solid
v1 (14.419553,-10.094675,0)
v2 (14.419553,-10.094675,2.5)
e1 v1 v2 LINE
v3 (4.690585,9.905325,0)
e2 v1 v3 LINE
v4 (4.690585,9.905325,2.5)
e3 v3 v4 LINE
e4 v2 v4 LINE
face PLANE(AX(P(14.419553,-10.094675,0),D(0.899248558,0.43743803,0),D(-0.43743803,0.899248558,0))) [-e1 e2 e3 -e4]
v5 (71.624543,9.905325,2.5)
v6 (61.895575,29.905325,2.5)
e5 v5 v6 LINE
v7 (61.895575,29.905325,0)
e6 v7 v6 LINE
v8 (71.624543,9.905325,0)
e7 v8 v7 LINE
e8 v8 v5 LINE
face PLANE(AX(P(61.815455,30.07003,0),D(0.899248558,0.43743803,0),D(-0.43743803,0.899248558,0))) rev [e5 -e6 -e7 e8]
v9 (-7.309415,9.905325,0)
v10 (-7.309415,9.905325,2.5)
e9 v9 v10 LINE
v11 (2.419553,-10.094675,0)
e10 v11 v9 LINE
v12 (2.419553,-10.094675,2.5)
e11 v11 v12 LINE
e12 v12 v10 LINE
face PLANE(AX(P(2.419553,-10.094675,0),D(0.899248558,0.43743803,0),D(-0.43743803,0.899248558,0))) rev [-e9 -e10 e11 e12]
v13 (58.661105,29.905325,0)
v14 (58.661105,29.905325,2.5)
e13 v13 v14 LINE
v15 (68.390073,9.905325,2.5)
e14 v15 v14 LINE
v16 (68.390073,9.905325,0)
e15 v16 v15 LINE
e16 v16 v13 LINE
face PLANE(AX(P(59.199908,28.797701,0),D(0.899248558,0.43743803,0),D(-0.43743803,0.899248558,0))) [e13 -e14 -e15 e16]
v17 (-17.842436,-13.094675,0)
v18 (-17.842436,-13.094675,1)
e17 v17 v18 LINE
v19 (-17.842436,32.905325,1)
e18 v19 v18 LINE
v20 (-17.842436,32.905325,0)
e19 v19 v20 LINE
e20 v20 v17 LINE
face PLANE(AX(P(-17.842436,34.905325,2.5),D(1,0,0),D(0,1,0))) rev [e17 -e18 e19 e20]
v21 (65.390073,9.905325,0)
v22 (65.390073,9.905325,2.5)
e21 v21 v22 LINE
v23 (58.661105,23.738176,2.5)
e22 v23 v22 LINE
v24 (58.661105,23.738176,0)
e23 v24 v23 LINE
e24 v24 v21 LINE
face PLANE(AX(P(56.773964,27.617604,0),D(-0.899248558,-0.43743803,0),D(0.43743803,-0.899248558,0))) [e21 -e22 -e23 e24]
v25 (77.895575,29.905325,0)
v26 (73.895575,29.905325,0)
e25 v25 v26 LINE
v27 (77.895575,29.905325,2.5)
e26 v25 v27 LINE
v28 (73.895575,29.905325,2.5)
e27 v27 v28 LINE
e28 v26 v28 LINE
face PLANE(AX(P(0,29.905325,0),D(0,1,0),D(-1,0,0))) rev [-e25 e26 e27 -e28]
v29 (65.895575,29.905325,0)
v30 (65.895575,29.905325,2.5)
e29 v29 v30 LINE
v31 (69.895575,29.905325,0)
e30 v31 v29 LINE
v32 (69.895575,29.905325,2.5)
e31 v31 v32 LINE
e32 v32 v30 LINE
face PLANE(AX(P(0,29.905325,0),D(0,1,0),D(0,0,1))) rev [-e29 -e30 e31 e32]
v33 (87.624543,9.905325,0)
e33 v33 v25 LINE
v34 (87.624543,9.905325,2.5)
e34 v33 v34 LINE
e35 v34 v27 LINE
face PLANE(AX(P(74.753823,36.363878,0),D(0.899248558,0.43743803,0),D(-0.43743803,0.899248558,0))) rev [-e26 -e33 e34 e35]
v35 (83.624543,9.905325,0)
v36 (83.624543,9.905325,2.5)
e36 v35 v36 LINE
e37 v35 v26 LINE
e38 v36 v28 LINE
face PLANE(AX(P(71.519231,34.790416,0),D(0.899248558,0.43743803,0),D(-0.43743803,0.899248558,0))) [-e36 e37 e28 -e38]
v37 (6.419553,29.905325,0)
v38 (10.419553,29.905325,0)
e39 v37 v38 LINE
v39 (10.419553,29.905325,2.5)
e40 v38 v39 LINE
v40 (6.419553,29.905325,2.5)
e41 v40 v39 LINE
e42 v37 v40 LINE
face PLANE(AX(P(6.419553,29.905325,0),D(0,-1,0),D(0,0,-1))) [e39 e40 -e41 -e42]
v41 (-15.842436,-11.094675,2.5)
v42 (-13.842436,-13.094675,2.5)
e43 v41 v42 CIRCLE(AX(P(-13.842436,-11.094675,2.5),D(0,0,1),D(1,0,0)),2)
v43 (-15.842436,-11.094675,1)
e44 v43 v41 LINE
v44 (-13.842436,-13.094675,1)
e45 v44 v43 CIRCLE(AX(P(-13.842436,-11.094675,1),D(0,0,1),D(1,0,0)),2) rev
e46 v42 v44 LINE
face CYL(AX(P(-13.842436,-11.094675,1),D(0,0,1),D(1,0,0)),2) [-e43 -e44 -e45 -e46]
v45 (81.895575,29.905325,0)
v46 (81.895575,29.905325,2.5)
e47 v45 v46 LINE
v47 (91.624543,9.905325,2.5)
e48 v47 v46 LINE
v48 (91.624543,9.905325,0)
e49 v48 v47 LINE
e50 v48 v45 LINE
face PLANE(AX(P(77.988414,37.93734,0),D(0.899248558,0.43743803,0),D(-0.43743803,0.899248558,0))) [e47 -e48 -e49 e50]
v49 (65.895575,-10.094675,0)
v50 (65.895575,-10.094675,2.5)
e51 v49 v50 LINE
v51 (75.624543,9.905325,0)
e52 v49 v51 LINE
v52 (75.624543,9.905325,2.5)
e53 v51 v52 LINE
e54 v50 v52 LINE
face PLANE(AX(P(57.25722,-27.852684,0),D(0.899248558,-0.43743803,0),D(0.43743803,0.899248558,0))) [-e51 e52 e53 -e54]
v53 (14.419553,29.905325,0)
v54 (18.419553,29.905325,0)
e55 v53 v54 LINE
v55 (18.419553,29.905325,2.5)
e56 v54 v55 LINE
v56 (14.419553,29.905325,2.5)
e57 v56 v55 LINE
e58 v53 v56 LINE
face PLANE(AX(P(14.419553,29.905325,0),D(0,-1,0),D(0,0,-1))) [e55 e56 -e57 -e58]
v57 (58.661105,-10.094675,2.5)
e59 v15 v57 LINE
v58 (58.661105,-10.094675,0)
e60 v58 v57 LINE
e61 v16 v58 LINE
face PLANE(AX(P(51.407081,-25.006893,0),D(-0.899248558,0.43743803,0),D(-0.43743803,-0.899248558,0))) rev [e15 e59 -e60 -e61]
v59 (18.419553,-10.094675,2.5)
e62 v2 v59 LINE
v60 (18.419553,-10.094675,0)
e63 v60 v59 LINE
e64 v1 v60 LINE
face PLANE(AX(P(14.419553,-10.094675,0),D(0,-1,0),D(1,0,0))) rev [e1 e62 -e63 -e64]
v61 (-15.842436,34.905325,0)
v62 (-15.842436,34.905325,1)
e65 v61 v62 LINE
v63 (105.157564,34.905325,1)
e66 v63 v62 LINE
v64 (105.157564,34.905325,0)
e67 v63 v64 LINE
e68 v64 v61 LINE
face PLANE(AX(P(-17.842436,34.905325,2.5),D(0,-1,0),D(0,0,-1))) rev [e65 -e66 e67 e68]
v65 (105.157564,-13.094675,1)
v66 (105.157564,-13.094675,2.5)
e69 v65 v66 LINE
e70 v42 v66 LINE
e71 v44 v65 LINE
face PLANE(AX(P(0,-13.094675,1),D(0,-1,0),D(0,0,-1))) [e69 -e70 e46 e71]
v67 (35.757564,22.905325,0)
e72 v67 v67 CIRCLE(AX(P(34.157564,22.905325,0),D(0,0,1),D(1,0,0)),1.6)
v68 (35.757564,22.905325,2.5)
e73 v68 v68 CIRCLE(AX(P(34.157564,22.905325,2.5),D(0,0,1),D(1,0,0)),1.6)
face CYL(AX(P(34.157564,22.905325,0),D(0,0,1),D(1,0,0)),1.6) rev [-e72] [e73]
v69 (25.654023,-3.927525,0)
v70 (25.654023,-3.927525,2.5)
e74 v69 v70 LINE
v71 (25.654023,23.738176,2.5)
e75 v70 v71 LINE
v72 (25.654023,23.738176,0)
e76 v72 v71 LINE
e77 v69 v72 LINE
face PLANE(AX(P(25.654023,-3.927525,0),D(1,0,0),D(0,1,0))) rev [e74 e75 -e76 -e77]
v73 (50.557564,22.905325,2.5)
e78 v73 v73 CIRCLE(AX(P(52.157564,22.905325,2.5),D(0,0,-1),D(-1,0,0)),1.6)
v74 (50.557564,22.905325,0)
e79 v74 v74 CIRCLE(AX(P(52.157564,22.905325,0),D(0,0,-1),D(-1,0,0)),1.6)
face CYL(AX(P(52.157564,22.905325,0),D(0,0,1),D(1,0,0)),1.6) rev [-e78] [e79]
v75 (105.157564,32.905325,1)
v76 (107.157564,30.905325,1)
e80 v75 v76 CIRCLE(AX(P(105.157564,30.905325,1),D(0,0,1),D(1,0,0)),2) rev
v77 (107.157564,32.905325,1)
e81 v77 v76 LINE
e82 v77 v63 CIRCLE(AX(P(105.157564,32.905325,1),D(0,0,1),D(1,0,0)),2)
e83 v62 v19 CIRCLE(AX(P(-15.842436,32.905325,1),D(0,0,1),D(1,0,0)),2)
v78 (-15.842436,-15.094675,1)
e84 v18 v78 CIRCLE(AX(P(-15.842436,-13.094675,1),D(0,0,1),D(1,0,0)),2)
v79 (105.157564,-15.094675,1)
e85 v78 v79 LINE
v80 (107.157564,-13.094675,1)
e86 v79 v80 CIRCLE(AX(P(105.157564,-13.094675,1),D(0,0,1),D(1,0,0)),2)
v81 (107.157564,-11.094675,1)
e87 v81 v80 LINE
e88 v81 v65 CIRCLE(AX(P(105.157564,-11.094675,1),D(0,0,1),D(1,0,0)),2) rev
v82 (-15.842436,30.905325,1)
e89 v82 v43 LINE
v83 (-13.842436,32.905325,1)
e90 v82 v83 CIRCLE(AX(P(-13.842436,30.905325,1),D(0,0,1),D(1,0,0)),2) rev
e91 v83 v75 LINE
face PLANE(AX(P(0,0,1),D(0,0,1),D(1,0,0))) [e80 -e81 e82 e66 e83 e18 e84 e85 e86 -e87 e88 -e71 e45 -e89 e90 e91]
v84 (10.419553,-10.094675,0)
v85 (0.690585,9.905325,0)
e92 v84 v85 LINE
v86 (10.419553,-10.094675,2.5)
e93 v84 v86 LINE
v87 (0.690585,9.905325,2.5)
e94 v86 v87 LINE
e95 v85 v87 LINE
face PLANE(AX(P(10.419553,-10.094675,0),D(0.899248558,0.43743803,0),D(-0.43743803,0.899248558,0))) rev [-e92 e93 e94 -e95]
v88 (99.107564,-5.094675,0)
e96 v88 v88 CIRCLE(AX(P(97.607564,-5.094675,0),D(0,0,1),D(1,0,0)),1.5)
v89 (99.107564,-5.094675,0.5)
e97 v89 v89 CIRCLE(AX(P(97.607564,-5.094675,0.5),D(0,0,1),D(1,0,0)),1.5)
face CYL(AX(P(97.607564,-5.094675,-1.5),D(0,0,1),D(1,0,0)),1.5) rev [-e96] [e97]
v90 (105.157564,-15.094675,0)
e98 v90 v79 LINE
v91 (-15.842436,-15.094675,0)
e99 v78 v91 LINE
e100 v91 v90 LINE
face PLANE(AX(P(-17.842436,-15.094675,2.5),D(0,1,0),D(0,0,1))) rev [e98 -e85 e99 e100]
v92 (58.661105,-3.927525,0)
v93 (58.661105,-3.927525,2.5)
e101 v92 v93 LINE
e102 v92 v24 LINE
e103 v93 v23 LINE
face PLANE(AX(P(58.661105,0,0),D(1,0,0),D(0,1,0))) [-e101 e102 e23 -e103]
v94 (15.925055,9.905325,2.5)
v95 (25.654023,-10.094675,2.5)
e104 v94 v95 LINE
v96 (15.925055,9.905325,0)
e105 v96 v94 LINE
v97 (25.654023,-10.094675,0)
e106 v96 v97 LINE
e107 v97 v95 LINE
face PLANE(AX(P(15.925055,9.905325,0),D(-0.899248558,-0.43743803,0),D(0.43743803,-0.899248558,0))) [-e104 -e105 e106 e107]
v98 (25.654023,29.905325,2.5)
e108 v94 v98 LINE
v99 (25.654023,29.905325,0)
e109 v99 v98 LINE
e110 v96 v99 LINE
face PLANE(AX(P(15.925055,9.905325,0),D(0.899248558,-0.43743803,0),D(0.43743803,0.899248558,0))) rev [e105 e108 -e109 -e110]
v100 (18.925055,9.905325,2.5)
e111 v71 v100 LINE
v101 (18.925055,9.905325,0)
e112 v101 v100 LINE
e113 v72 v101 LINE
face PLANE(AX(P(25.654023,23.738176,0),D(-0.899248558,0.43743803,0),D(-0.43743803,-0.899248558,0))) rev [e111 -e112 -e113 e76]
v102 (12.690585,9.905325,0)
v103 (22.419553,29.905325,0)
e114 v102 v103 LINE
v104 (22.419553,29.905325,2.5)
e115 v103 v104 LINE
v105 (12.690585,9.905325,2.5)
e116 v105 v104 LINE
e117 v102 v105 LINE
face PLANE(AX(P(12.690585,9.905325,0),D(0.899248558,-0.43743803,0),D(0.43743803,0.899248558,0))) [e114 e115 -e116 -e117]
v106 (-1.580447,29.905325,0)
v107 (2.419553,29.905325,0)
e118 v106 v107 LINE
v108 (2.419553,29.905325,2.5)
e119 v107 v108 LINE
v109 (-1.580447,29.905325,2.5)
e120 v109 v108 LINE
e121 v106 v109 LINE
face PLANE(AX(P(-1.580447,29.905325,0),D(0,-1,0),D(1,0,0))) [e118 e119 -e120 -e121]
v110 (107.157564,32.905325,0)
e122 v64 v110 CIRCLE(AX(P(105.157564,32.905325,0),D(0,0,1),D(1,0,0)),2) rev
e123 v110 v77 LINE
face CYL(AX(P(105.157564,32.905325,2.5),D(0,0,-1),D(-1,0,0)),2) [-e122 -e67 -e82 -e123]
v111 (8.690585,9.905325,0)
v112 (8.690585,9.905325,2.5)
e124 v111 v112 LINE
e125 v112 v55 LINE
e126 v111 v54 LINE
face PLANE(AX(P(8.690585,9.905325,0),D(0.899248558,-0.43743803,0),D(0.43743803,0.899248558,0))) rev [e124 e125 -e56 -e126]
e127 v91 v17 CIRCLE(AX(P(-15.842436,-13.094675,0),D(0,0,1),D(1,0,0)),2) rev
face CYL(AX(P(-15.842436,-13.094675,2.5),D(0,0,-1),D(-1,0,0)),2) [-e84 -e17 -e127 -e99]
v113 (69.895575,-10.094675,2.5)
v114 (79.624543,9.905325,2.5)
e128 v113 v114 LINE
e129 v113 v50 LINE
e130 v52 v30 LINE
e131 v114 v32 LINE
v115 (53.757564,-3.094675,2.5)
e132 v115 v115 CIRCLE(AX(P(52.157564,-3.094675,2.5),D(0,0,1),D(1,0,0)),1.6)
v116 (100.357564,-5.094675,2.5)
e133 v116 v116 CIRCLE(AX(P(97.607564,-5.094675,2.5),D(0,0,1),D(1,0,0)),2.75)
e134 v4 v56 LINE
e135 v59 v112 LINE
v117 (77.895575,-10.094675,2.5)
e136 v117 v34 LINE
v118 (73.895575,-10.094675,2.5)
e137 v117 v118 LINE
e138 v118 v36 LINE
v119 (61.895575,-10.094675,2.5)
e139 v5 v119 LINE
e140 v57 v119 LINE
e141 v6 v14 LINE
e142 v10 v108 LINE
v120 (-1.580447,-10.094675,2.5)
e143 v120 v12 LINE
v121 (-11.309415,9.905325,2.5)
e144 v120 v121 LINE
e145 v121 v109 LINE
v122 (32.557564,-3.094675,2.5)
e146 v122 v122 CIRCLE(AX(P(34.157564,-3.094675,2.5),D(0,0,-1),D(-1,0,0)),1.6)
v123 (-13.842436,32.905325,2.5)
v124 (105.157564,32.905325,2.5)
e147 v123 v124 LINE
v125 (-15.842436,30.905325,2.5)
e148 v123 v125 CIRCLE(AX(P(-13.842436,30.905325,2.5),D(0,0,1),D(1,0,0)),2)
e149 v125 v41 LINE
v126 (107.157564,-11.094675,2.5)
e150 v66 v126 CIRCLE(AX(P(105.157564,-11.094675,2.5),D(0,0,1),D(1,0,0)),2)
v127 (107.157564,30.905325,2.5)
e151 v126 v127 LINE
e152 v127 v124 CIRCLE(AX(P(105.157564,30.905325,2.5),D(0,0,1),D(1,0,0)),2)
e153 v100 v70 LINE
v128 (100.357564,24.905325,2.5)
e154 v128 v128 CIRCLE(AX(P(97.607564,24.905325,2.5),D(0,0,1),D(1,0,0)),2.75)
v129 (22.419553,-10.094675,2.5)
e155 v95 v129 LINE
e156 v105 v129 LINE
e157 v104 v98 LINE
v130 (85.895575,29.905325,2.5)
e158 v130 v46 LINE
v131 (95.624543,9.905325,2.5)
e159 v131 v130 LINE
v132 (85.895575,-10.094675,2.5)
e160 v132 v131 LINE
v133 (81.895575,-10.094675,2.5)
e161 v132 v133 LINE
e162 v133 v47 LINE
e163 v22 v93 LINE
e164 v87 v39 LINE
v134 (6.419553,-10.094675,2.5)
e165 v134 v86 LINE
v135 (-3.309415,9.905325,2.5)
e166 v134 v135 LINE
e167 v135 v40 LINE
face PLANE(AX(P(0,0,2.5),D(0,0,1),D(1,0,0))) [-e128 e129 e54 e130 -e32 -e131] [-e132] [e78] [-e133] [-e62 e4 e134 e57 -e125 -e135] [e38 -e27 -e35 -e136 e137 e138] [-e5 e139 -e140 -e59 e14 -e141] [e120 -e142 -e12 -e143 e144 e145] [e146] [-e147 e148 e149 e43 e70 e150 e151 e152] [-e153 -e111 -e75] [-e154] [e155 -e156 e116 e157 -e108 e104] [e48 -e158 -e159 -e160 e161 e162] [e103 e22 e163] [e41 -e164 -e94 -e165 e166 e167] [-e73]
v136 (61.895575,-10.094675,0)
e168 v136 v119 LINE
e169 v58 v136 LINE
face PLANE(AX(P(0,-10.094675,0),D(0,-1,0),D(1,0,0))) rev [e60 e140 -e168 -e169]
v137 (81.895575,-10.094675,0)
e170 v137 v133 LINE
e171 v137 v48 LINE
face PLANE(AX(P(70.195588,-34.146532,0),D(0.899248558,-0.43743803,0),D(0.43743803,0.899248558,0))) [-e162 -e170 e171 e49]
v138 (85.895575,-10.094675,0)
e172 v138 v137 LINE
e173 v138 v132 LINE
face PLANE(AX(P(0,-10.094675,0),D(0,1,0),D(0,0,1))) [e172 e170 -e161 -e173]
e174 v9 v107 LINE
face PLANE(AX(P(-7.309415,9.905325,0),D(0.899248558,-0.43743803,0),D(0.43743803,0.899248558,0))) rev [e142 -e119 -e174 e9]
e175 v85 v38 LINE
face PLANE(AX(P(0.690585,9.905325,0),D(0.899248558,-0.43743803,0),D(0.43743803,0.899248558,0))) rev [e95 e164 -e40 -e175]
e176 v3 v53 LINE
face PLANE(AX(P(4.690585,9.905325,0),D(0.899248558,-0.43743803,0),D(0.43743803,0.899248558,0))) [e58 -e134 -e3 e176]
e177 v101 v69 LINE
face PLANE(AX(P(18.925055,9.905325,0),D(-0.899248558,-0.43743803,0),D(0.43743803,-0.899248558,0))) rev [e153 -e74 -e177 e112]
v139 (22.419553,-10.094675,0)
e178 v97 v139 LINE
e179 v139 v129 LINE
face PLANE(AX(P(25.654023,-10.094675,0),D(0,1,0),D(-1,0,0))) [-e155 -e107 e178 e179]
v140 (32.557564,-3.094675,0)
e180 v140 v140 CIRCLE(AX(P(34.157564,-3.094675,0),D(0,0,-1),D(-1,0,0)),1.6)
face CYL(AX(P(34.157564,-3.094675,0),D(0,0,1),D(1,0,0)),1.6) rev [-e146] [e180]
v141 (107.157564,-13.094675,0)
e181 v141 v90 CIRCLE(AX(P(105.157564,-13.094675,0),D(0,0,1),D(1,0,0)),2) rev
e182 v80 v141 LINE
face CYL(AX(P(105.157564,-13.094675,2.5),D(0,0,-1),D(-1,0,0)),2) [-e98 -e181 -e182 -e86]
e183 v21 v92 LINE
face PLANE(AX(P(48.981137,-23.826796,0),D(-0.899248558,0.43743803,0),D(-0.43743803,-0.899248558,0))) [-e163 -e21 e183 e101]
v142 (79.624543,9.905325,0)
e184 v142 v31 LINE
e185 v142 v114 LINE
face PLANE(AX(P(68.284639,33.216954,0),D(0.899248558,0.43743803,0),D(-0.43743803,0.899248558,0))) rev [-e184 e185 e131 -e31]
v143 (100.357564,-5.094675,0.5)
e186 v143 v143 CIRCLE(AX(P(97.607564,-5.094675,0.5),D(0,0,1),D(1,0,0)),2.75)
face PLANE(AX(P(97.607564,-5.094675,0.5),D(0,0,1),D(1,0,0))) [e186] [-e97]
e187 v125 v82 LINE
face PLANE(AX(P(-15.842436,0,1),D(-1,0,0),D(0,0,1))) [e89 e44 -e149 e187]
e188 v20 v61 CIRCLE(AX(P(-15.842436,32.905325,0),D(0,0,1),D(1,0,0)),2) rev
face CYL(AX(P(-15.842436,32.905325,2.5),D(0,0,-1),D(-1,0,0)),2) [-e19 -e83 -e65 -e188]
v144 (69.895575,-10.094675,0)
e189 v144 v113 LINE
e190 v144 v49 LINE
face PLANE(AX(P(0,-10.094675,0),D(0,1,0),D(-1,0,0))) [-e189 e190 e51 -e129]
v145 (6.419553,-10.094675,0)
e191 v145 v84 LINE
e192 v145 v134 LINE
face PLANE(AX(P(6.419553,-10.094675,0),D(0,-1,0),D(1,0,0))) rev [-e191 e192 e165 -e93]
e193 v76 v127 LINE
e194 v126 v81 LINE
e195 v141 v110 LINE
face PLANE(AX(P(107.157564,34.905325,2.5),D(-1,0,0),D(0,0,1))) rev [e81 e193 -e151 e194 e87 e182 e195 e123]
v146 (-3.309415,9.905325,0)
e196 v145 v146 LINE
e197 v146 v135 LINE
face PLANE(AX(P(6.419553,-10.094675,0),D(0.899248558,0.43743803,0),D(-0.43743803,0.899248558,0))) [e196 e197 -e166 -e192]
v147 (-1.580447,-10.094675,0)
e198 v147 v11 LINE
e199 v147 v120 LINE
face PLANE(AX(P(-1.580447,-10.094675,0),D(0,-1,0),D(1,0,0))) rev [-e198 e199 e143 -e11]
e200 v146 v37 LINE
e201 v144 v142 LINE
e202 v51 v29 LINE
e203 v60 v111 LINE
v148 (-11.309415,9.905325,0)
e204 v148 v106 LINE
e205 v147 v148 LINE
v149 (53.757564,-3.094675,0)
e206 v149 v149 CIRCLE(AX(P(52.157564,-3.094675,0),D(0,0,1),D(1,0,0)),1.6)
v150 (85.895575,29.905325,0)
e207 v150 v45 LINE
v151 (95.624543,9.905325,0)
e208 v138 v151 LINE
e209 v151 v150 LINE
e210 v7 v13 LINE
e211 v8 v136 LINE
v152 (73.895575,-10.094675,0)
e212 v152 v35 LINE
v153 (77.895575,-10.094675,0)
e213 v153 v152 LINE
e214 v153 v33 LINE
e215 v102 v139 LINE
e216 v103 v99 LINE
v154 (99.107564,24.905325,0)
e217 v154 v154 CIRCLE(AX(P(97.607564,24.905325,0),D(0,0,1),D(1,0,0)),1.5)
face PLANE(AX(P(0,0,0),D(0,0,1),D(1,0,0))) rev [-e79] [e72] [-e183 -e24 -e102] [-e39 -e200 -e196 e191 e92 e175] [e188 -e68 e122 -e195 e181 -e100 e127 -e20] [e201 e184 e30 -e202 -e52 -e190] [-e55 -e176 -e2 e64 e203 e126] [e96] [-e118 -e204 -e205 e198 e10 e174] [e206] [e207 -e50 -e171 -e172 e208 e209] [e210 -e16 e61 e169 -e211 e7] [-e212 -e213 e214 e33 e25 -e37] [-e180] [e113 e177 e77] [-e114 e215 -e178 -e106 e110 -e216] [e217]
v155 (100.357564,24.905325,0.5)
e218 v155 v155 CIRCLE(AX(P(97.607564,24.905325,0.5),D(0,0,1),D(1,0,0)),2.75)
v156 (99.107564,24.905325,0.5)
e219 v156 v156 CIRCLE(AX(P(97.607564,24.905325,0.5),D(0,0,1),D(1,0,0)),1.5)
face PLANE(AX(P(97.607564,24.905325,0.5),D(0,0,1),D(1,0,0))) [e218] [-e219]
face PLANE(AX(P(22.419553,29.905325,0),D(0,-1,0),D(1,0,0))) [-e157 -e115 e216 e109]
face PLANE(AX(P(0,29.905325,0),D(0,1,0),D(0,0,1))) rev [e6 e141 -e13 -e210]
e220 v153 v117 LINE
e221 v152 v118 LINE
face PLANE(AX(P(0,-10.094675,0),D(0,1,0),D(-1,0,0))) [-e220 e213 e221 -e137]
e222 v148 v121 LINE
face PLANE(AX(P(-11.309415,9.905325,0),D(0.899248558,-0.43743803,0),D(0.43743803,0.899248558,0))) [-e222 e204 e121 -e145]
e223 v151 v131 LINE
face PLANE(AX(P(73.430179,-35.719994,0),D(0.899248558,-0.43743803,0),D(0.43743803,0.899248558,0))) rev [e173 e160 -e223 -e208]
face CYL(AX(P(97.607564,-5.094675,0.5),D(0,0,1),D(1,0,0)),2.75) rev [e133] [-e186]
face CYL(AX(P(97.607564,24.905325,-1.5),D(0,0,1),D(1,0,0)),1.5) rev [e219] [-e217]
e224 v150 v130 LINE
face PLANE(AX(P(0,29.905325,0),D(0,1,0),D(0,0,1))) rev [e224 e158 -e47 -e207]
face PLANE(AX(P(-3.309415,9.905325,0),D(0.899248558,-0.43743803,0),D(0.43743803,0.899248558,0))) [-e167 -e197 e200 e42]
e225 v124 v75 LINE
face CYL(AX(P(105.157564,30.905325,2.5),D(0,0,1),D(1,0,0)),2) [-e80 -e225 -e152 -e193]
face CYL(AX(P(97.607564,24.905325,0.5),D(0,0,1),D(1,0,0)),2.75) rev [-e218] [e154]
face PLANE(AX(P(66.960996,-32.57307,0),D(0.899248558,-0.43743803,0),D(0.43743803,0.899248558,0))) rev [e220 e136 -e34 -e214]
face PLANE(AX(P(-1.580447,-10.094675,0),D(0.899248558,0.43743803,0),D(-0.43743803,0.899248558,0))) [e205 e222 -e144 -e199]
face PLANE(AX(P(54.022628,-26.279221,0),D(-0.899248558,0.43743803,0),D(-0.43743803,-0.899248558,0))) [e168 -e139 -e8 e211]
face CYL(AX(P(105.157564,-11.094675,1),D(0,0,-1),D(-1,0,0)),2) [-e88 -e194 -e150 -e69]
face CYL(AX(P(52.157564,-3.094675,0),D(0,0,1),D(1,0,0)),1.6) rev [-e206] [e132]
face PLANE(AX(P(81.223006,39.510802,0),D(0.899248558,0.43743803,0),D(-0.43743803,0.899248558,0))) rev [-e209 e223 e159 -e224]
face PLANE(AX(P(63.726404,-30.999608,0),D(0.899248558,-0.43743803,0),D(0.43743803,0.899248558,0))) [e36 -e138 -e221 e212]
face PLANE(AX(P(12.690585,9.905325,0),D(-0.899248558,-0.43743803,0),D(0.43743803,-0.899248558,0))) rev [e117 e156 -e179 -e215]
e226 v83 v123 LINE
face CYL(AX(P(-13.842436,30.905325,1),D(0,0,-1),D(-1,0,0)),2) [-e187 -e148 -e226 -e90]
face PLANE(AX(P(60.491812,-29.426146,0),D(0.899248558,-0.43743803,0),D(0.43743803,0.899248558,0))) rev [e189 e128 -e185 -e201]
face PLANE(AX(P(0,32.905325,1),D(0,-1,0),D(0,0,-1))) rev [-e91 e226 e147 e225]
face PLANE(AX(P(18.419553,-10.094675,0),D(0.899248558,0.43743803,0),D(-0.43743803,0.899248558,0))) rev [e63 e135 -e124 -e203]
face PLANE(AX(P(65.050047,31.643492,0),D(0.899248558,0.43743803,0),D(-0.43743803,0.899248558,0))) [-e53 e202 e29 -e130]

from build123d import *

# Parameters (mm, degrees)
ESBO_O1_W                  = 125
ESBO_O1_H                  = 50
RESSALTO_EXTRUS_O1_DEPTH   = 2.5
ESBO_O2_R                  = 1.6
CORTE_EXTRUS_O2_DEPTH      = 2.5
CORTE_EXTRUS_O3_DEPTH      = 1.5
CORTE_EXTRUS_O5_DEPTH      = 113.726994752
CORTE_EXTRUS_O5_DEPTH_BACK = 113.726994752
ESBO_O12_R                 = 2.75
CORTE_EXTRUS_O6_DEPTH      = 2
ESBO_O19_R                 = 1.5
CORTE_EXTRUS_O7_DEPTH      = 2
FILETE1_R                  = 2


with BuildPart() as part:
    # Esboço1 → Ressalto-extrusão1 (new body)
    with BuildSketch(Plane.XY):
        with Locations((44.657564369, 9.905325444)):
            Rectangle(ESBO_O1_W, ESBO_O1_H)
    extrude(amount=RESSALTO_EXTRUS_O1_DEPTH)

    # Esboço2 → Corte-extrusão2 (cut)
    with BuildSketch(Plane.XY.offset(2.5)):
        with Locations((34.157564369, 22.905325444)):
            Circle(ESBO_O2_R)
        with Locations(Location((34.157564369, -3.094674556, 0), (0, 0, 180))):
            Circle(ESBO_O2_R)
        with Locations((52.157564369, -3.094674556)):
            Circle(ESBO_O2_R)
        with Locations(Location((52.157564369, 22.905325444, 0), (0, 0, 180))):
            Circle(ESBO_O2_R)
    extrude(amount=-CORTE_EXTRUS_O2_DEPTH, mode=Mode.SUBTRACT)

    # Esboço3 → Corte-extrusão3 (cut)
    with BuildSketch(Plane.XY.offset(2.5)):
        Polygon((-17.842435631, 32.905325444), (-17.842435631, 9.905325444), (-15.842435631, 9.905325444), (-15.842435631, 32.905325444), (107.157564369, 32.905325444), (107.157564369, 34.905325444), (-15.842435631, 34.905325444), (-17.842435631, 34.905325444), align=None)
        Polygon((-15.842435631, 9.905325444), (-17.842435631, 9.905325444), (-17.842435631, -13.094674556), (-17.842435631, -15.094674556), (-15.842435631, -15.094674556), (107.157564369, -15.094674556), (107.157564369, -13.094674556), (-15.842435631, -13.094674556), align=None)
    extrude(amount=-CORTE_EXTRUS_O3_DEPTH, mode=Mode.SUBTRACT)

    # Esboço4 → Corte-extrusão5 (cut, two sides: drawn at the far end of the back side and taken through both)
    with BuildSketch(Plane.XY.offset(2.5).offset(-CORTE_EXTRUS_O5_DEPTH_BACK)):
        Polygon((15.925055292, 9.905325444), (25.654023464, 29.905325444), (22.419553485, 29.905325444), (12.690585312, 9.905325444), (22.419553485, -10.094674556), (25.654023464, -10.094674556), align=None)
        Polygon((25.654023464, 23.738176067), (18.925055292, 9.905325444), (25.654023464, -3.927525179), align=None)
        Polygon((8.690585312, 9.905325444), (18.419553485, 29.905325444), (14.419553485, 29.905325444), (4.690585312, 9.905325444), (14.419553485, -10.094674556), (18.419553485, -10.094674556), align=None)
        Polygon((0.690585312, 9.905325444), (10.419553485, 29.905325444), (6.419553485, 29.905325444), (-3.309414688, 9.905325444), (6.419553485, -10.094674556), (10.419553485, -10.094674556), align=None)
        Polygon((-7.309414688, 9.905325444), (2.419553485, 29.905325444), (-1.580446515, 29.905325444), (-11.309414688, 9.905325444), (-1.580446515, -10.094674556), (2.419553485, -10.094674556), align=None)
        Polygon((85.895575254, -10.094674556), (95.624543426, 9.905325444), (85.895575254, 29.905325444), (81.895575254, 29.905325444), (91.624543426, 9.905325444), (81.895575254, -10.094674556), align=None)
        Polygon((77.895575254, -10.094674556), (87.624543426, 9.905325444), (77.895575254, 29.905325444), (73.895575254, 29.905325444), (83.624543426, 9.905325444), (73.895575254, -10.094674556), align=None)
        Polygon((69.895575254, -10.094674556), (79.624543426, 9.905325444), (69.895575254, 29.905325444), (65.895575254, 29.905325444), (75.624543426, 9.905325444), (65.895575254, -10.094674556), align=None)
        Polygon((71.624543426, 9.905325444), (61.895575254, 29.905325444), (58.661105274, 29.905325444), (68.390073446, 9.905325444), (58.661105274, -10.094674556), (61.895575254, -10.094674556), align=None)
        Polygon((65.390073446, 9.905325444), (58.661105274, -3.927525179), (58.661105274, 23.738176067), align=None)
    extrude(amount=CORTE_EXTRUS_O5_DEPTH + CORTE_EXTRUS_O5_DEPTH_BACK, mode=Mode.SUBTRACT)

    # Esboço12 → Corte-extrusão6 (cut)
    with BuildSketch(Plane.XY.offset(2.5)):
        with Locations((97.607564369, 24.905325444)):
            Circle(ESBO_O12_R)
        with Locations((97.607564369, -5.094674556)):
            Circle(ESBO_O12_R)
    extrude(amount=-CORTE_EXTRUS_O6_DEPTH, mode=Mode.SUBTRACT)

    # Esboço19 → Corte-extrusão7 (cut)
    with BuildSketch(Plane.XY.offset(0.5)):
        with Locations((97.607564369, 24.905325444)):
            Circle(ESBO_O19_R)
        with Locations((97.607564369, -5.094674556)):
            Circle(ESBO_O19_R)
    extrude(amount=-CORTE_EXTRUS_O7_DEPTH, mode=Mode.SUBTRACT)

    # Filete1
    filete1_edges = [part.edges().sort_by_distance(p)[0] for p in [
        (-17.842435631, -15.094674556, 0.5),
        (-15.842435631, -13.094674556, 1.75),
        (-17.842435631, 34.905325444, 0.5),
        (-15.842435631, 32.905325444, 1.75),
        (107.157564369, -15.094674556, 0.5),
        (107.157564369, -13.094674556, 1.75),
        (107.157564369, 32.905325444, 1.75),
        (107.157564369, 34.905325444, 0.5),
    ]]
    fillet(filete1_edges, radius=FILETE1_R - 0.0001)  # a hair under: the kernel refuses the full size


solid = part.part
